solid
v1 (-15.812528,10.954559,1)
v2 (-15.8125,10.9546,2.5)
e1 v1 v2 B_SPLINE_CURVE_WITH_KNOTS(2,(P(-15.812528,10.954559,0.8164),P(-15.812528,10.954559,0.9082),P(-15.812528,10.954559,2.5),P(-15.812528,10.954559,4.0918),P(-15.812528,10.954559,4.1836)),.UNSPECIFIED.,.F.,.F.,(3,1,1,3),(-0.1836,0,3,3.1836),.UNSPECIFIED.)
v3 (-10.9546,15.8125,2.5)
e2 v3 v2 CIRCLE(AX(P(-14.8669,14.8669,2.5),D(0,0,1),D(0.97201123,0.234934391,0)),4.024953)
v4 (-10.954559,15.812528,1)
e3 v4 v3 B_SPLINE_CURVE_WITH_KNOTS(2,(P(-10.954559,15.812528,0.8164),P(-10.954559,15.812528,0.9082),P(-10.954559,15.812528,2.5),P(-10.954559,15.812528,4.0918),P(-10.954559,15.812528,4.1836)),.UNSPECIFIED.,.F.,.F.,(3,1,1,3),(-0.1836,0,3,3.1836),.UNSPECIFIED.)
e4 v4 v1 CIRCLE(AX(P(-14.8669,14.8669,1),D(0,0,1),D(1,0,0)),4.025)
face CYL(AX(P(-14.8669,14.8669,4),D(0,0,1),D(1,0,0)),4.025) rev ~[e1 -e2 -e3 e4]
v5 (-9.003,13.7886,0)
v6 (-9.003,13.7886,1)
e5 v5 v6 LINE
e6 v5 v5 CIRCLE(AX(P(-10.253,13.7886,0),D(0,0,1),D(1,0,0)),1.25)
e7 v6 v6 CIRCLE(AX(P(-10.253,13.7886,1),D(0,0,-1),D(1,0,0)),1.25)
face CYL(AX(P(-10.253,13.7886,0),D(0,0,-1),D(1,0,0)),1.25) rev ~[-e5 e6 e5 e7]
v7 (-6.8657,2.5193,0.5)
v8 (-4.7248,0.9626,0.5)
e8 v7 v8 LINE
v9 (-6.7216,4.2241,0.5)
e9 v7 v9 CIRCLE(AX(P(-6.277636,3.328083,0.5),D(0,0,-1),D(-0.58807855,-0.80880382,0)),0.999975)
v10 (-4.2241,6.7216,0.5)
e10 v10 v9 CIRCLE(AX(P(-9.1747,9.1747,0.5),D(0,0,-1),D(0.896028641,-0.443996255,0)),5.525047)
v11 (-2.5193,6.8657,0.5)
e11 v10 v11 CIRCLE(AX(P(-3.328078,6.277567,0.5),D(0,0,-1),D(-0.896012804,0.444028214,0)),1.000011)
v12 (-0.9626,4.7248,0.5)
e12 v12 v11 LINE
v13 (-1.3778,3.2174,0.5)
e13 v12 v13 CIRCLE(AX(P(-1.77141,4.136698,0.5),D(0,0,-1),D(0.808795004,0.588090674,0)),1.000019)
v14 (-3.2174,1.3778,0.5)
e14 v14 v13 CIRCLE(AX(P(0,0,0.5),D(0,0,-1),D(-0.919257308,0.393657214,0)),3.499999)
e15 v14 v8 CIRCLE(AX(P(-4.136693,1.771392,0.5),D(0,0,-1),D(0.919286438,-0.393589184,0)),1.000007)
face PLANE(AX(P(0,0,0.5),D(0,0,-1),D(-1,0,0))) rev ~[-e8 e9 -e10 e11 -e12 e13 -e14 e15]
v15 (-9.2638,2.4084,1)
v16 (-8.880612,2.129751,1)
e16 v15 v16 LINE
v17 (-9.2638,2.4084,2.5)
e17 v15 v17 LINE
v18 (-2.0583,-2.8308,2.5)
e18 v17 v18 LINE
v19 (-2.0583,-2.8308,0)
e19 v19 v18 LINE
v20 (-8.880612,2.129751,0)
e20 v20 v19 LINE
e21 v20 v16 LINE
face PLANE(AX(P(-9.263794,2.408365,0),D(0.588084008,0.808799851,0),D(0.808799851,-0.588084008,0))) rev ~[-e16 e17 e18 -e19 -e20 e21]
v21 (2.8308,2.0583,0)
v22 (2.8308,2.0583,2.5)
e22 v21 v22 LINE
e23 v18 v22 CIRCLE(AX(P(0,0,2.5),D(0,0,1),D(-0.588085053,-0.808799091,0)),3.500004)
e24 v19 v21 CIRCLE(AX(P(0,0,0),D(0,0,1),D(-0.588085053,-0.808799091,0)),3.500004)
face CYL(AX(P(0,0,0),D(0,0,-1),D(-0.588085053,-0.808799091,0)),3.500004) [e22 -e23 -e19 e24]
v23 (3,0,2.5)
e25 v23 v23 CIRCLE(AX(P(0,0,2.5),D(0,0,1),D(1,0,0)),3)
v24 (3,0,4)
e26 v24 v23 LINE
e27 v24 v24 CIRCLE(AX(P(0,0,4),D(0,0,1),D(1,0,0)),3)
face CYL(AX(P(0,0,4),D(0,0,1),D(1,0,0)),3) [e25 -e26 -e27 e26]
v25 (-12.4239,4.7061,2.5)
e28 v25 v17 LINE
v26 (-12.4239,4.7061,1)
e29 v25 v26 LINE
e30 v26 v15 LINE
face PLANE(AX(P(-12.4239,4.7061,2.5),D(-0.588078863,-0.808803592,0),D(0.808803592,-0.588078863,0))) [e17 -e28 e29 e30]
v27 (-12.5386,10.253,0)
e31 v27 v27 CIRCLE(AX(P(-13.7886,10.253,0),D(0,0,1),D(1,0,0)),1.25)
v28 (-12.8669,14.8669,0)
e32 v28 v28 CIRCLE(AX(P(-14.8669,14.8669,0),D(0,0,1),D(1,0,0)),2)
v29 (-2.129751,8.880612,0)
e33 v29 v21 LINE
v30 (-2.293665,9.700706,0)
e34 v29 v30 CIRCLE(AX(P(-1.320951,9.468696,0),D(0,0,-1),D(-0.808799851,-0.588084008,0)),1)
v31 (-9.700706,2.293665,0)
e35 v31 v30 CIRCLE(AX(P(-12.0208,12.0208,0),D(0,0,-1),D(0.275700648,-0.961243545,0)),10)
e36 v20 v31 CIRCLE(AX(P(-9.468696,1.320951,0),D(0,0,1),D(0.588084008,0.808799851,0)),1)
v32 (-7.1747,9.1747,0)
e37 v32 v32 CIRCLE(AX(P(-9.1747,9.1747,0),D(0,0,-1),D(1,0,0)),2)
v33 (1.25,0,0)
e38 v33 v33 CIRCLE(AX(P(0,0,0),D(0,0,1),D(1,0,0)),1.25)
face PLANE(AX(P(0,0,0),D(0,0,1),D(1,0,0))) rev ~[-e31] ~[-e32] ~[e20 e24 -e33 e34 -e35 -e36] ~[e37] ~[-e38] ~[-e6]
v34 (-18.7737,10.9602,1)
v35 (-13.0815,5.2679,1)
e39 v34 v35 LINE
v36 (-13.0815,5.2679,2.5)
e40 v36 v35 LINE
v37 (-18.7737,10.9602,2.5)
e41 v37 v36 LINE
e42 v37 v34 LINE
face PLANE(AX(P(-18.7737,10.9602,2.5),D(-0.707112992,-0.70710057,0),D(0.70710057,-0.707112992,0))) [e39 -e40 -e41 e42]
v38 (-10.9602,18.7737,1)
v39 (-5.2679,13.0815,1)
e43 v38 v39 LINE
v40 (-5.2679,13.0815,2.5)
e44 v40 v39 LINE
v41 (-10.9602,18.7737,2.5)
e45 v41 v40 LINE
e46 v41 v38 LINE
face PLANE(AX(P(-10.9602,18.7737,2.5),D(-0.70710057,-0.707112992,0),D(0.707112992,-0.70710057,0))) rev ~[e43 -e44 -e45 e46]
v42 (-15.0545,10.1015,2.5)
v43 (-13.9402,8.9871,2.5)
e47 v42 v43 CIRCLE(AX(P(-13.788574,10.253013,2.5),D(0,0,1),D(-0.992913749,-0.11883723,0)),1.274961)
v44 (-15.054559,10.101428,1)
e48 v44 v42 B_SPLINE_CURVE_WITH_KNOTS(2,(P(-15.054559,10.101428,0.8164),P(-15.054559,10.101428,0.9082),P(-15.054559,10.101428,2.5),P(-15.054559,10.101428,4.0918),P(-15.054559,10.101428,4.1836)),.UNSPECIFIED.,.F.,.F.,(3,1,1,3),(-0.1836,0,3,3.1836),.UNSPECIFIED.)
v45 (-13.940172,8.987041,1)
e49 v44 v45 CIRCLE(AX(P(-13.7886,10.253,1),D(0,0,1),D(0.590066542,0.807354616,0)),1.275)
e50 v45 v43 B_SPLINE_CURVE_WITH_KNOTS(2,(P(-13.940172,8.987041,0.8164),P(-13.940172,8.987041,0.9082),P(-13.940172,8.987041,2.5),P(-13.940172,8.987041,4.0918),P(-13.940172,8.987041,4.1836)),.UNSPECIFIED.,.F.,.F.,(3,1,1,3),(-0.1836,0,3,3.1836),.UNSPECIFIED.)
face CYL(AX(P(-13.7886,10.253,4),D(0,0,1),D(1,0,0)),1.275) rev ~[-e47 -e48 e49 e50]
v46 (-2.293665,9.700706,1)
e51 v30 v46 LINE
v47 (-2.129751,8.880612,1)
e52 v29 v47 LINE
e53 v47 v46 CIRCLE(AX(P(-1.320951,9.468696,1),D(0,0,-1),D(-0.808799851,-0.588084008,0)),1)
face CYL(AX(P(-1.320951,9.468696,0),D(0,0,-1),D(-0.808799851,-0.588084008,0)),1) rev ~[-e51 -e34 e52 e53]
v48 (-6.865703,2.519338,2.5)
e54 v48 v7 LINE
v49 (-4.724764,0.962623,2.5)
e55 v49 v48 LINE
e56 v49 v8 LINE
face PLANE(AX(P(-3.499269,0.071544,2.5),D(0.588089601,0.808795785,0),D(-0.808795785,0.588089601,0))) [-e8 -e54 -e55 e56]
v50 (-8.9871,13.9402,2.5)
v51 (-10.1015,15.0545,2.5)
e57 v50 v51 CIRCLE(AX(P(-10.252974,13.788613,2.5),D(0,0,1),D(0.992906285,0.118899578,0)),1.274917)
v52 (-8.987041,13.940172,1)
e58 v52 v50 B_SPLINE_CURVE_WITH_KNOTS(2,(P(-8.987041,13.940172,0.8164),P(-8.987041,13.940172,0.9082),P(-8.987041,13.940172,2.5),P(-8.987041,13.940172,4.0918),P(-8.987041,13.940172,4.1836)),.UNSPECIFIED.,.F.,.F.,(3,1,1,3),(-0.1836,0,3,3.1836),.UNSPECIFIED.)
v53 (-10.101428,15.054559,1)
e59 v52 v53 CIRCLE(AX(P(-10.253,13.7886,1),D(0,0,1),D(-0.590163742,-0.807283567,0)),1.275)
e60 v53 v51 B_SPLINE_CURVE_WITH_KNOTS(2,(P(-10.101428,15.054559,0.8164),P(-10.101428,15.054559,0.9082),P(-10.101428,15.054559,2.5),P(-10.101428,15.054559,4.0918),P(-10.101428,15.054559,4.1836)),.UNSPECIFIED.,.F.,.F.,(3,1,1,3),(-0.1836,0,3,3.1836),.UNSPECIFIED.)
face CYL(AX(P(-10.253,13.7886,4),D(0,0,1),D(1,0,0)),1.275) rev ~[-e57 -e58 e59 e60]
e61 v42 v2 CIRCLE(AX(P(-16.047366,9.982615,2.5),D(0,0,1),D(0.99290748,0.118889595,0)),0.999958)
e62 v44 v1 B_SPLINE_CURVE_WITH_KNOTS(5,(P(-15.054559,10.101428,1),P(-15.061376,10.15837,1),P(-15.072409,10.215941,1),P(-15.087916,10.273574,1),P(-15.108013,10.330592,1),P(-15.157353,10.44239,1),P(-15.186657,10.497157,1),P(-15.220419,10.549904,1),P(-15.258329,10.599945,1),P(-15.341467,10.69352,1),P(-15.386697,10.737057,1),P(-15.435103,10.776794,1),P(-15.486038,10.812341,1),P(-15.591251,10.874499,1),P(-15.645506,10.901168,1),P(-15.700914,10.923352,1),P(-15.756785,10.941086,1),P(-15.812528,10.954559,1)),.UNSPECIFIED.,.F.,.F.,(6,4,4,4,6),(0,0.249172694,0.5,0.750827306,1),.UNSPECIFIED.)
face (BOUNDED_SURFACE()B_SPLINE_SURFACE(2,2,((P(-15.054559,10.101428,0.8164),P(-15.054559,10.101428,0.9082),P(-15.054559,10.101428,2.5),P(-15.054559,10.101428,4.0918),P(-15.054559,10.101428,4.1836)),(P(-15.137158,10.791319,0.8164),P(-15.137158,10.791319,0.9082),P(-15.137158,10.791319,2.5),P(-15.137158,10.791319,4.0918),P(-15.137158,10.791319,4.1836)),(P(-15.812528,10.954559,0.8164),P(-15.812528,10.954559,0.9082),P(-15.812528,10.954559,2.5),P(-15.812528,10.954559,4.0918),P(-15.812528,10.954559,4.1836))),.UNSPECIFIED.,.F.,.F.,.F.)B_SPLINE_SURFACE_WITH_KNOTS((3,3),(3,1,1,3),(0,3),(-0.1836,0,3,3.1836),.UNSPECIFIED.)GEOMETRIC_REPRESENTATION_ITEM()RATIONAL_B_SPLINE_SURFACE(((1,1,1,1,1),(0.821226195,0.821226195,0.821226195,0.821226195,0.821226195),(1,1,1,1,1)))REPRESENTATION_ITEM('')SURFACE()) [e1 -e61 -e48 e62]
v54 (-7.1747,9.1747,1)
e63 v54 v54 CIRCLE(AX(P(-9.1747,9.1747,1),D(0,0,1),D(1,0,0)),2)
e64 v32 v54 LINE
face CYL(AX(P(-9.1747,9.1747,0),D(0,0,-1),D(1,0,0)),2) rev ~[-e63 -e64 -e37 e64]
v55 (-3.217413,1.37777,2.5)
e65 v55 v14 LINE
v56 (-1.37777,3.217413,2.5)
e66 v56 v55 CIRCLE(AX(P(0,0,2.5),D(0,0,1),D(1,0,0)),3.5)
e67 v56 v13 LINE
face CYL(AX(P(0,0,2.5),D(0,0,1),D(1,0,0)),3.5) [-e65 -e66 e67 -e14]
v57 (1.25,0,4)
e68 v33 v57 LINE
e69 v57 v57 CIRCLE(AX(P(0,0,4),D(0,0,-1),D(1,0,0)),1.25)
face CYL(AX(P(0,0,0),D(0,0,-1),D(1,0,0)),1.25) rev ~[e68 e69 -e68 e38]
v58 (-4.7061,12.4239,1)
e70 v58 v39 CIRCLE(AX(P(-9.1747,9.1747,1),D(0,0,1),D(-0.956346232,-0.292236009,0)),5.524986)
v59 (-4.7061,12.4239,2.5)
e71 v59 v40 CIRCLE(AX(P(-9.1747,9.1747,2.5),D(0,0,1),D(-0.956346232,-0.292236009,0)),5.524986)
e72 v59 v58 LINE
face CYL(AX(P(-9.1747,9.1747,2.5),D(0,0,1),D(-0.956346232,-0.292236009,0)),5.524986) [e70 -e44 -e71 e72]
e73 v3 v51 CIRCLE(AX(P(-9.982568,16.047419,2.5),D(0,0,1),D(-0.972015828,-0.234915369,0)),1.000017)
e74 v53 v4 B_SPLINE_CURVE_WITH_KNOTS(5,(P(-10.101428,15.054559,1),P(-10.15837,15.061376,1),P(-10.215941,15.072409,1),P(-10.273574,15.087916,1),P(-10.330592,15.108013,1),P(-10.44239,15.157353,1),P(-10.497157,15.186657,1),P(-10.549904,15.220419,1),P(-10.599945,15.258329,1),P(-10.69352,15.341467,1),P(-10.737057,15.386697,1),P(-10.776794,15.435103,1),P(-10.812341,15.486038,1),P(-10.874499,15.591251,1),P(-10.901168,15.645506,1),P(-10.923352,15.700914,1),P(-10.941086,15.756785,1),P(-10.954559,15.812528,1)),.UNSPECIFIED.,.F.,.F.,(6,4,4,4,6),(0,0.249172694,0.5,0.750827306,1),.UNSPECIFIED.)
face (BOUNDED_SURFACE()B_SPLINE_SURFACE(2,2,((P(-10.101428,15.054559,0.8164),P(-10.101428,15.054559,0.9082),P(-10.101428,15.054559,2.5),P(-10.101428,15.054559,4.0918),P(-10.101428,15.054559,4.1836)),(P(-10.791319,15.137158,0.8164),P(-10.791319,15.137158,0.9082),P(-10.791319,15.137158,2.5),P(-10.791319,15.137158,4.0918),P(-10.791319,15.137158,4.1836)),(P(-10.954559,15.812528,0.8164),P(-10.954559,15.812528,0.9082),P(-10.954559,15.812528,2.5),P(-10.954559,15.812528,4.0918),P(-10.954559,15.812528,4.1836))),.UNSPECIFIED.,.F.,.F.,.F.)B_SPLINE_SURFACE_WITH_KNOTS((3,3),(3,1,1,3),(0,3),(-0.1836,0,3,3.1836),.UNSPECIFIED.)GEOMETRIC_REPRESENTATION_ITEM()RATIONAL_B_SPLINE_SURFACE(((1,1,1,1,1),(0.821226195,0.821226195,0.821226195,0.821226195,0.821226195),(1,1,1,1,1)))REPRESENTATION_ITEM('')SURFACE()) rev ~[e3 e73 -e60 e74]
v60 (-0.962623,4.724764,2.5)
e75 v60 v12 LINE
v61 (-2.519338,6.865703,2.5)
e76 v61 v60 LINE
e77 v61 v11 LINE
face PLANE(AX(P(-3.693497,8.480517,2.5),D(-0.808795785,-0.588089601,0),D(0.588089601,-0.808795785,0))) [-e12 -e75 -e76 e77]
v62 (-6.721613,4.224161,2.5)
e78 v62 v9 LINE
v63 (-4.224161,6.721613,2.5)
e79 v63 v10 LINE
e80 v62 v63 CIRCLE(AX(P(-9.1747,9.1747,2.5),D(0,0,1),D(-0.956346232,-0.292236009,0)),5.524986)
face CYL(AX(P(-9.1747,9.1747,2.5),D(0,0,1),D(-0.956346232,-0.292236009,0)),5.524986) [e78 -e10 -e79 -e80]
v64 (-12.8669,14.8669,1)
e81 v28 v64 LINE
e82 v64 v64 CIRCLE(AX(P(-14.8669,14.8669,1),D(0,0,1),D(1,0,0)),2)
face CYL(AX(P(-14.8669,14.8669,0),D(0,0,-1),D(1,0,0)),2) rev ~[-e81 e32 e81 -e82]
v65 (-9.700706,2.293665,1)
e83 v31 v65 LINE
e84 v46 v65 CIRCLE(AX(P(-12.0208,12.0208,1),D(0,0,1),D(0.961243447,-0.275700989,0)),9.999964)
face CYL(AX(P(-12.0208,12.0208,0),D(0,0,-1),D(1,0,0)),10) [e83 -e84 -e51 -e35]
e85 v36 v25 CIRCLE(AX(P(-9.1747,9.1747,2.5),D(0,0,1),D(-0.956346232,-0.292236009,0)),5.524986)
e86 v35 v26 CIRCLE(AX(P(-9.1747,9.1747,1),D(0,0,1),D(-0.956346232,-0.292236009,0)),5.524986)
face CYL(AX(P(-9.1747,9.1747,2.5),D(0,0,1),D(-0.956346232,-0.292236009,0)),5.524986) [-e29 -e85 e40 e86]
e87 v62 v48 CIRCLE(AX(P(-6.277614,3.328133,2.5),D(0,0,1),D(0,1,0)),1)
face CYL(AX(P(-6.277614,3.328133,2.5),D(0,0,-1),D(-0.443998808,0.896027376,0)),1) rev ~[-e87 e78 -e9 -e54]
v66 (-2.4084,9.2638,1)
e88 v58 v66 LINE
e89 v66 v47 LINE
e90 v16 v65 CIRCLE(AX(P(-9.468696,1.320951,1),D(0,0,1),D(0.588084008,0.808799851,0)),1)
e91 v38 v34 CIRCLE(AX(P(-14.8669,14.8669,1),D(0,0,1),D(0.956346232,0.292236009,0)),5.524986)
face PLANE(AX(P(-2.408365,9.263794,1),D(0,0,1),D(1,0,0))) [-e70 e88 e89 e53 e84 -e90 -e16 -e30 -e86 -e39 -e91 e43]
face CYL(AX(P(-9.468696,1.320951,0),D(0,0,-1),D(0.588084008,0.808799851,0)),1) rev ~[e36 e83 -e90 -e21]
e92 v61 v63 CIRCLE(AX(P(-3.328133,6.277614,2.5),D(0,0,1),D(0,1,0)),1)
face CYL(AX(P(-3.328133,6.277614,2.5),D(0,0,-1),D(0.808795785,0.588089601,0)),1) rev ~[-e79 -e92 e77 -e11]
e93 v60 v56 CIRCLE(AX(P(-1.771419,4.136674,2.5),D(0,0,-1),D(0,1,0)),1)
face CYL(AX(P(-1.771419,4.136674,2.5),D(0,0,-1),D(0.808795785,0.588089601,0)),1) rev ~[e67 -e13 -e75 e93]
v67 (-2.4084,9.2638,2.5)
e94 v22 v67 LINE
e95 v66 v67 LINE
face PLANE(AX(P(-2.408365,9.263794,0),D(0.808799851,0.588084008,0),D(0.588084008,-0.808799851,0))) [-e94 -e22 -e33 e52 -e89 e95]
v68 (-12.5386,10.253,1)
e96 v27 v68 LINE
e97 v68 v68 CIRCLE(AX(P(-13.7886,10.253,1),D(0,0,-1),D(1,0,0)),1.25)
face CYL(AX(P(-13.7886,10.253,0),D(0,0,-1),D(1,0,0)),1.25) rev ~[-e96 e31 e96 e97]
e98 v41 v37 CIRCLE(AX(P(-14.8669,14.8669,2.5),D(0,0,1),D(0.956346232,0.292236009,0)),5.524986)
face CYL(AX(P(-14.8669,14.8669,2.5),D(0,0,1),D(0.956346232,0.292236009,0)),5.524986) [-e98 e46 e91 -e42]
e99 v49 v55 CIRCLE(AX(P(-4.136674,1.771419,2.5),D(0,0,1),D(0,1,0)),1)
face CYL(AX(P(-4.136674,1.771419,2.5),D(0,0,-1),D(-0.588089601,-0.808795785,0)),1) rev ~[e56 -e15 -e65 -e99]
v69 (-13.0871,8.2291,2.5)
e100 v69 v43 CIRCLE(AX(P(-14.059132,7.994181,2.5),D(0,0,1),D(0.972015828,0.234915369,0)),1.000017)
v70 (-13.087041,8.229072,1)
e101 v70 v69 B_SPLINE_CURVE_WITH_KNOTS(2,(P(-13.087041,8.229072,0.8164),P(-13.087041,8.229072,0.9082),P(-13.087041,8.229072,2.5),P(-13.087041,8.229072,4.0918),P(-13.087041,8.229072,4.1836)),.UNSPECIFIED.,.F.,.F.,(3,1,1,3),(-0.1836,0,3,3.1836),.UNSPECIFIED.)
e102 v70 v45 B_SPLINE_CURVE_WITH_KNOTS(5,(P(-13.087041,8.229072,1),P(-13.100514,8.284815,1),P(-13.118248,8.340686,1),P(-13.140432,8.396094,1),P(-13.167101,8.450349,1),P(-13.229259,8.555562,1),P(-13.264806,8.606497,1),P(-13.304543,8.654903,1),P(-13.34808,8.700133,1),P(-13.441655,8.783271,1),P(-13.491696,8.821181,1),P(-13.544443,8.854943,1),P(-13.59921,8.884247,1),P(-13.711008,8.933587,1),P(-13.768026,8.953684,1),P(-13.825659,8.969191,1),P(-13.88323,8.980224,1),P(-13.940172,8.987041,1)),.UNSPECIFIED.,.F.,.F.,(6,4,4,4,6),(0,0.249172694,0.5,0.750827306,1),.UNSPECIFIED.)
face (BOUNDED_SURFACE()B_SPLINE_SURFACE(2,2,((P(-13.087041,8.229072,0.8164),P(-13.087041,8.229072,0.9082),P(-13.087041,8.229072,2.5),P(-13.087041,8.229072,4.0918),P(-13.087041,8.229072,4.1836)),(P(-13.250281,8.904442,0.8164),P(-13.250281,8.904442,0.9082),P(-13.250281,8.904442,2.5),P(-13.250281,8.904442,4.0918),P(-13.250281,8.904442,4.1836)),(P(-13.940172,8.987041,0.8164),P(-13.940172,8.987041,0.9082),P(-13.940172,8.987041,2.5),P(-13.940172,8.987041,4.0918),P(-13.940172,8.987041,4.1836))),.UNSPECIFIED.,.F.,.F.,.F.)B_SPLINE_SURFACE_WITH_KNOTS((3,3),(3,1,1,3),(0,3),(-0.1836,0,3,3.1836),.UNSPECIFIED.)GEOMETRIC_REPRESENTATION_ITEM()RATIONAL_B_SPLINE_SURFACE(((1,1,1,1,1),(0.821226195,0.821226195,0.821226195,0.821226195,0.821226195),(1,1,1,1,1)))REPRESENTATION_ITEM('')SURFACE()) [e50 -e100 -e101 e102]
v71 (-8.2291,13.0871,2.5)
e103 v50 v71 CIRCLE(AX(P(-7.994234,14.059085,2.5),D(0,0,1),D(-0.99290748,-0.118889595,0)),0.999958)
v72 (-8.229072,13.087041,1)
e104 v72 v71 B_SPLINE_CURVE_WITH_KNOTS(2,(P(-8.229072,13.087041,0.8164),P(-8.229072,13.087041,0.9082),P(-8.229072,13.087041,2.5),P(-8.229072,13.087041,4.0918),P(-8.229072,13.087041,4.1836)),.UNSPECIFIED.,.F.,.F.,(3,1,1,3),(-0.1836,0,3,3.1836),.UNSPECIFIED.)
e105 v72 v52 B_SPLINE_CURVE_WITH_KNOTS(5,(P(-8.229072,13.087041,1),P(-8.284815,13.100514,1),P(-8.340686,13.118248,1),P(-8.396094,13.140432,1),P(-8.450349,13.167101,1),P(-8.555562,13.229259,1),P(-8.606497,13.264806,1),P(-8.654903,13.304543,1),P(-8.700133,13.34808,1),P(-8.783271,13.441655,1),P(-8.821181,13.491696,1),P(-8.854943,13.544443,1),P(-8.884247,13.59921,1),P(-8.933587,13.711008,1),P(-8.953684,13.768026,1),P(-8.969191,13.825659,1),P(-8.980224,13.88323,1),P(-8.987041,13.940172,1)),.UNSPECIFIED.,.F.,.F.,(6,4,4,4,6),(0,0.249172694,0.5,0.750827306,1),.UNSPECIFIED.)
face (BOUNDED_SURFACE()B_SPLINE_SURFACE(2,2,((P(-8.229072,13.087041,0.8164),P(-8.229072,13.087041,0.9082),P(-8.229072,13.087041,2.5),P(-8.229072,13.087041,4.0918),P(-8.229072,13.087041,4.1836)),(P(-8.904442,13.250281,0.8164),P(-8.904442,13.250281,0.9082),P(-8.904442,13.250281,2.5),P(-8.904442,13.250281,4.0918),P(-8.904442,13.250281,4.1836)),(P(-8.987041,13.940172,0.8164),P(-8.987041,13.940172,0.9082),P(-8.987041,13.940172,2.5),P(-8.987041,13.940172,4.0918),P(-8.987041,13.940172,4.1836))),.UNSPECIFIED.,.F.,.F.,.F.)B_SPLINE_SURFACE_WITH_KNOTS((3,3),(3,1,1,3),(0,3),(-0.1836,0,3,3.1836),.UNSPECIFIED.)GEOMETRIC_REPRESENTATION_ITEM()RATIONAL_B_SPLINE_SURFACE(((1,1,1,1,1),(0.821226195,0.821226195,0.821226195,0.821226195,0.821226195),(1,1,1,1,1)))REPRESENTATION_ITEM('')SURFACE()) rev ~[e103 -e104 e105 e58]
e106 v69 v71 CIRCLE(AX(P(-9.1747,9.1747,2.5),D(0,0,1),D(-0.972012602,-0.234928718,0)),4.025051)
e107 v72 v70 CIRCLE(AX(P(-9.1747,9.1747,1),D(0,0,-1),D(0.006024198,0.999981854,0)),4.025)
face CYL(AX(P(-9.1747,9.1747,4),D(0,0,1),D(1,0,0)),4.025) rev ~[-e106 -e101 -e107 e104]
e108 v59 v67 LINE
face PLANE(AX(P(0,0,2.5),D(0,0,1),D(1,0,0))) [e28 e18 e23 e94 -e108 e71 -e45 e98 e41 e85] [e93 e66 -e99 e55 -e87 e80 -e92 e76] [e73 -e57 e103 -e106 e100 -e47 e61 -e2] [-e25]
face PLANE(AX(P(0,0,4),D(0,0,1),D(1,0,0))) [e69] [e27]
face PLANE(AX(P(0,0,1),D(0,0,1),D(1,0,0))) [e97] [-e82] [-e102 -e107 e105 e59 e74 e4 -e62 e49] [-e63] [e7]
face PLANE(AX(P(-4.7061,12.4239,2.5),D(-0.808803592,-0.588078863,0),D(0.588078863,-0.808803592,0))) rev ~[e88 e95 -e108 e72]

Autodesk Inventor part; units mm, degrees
ref_plane "YZ Plane" through (0, 0, 0) normal (1, 0, 0) x (0, 1, 0)
ref_plane "XZ Plane" through (0, 0, 0) normal (0, 1, 0) x (-1, 0, 0)
ref_plane "XY Plane" through (0, 0, 0) normal (0, 0, 1) x (1, 0, 0)
sketch "スケッチ1" plane through (0, 0, 0) normal (0, 0, 1) x (1, 0, 0)
  line L0 (0, 0) -> (-12.0208, 12.0208)
  circle A0 centre (-9.1747, 9.1747) radius 2
  circle A1 centre (-14.8669, 14.8669) radius 2
  circle A2 centre (-14.8669, 14.8669) radius 4.025 construction
  circle A3 centre (-9.1747, 9.1747) radius 4.025 construction
  circle A4 centre (-13.7886, 10.253) radius 1.25
  circle A5 centre (-10.253, 13.7886) radius 1.25
  line L1 (-13.7886, 10.253) -> (-10.253, 13.7886) construction
  circle A6 centre (0, 0) radius 1.25
  arc A7 (-2.4749, 2.4749) -> (-2.0583, -2.8308) centre (0, 0) ccw construction
  arc A8 (-14.6971, 9.3445) -> (-9.5747, 16.4536) centre (-14.8669, 14.8669) ccw construction
  arc A9 (-14.467, 7.588) -> (-12.4239, 4.7061) centre (-9.1747, 9.1747) ccw
  line L2 (-12.4239, 4.7061) -> (-2.0583, -2.8308)
  line L3 (-4.7061, 12.4239) -> (2.8308, 2.0583)
  arc A10 (-11.1417, 16.3911) -> (-7.588, 14.467) centre (-10.253, 13.7886) ccw construction
  arc A11 (-16.4536, 9.5747) -> (-14.467, 7.588) centre (-13.7886, 10.253) ccw
  arc A12 (-16.3911, 11.1417) -> (-16.4536, 9.5747) centre (-13.7886, 10.253) ccw construction
  arc A13 (-14.467, 7.588) -> (-16.3911, 11.1417) centre (-13.7886, 10.253) ccw construction
  arc A14 (-16.4536, 9.5747) -> (-14.6971, 9.3445) centre (-14.8669, 14.8669) ccw construction
  arc A15 (-14.6971, 9.3445) -> (-14.467, 7.588) centre (-9.1747, 9.1747) ccw construction
  arc A16 (-9.5747, 16.4536) -> (-11.1417, 16.3911) centre (-10.253, 13.7886) ccw construction
  arc A17 (-7.588, 14.467) -> (-9.3445, 14.6971) centre (-9.1747, 9.1747) ccw construction
  arc A18 (-7.588, 14.467) -> (-9.5747, 16.4536) centre (-10.253, 13.7886) ccw
  arc A19 (-9.5747, 16.4536) -> (-16.4536, 9.5747) centre (-14.8669, 14.8669) ccw
  arc A20 (-9.3445, 14.6971) -> (-14.6971, 9.3445) centre (-9.1747, 9.1747) ccw construction
  arc A21 (-4.7061, 12.4239) -> (-7.588, 14.467) centre (-9.1747, 9.1747) ccw
  arc A22 (-12.4239, 4.7061) -> (-4.7061, 12.4239) centre (-9.1747, 9.1747) ccw construction
  arc A23 (2.8308, 2.0583) -> (-2.4749, 2.4749) centre (0, 0) ccw construction
  arc A24 (-2.0583, -2.8308) -> (2.8308, 2.0583) centre (0, 0) ccw
  circle A25 centre (-12.0208, 12.0208) radius 10
  point P0 (-2.4084, 9.2638)
  point P1 (-9.2638, 2.4084)
  dimension "d3" = 8.05
  dimension "d0" = 4
  dimension "d1" = 4
  dimension "d2" = 8.05
  dimension "d4" = 2.5
  dimension "d5" = 2.5
  dimension "d6" = 5
  dimension "d7" = 2.5
  dimension "d8" = 7
  dimension "d9" = 1.5
  dimension "d10" = 1.5
  dimension "d11" = 1.5
  dimension "d12" = 1.5
  dimension "d13" = 17
  dimension "d59" = 20
extrude "押し出し1" add sketch "スケッチ1" along normal blind 4
sketch "スケッチ2" plane through (0, 0, 4) normal (0, 0, 1) x (1, 0, 0)
  circle A0 centre (-14.8669, 14.8669) radius 2 projected
  circle A1 centre (-13.7886, 10.253) radius 1.25 projected
  circle A2 centre (-10.253, 13.7886) radius 1.25 projected
  circle A3 centre (-9.1747, 9.1747) radius 2 projected
  circle A4 centre (-14.8669, 14.8669) radius 4.025
  circle A5 centre (-9.1747, 9.1747) radius 4.025
  point P0 (0, 0)
  point P1 (-10.842, 14.8911)
  point P2 (-14.8911, 10.842)
  point P3 (-13.0613, 11.2697)
  point P4 (-12.0208, 12.0208)
  point P5 (-11.2697, 13.0613)
  point P6 (-9.1505, 13.1996)
  point P7 (-10.9804, 12.772)
  point P8 (-12.772, 10.9804)
  point P9 (-13.1996, 9.1505)
  dimension "d17" = 8.05
  dimension "d18" = 8.05
extrude "押し出し2" cut sketch "スケッチ2" against normal blind 3 contours A1 A5 A2 | A1 A4 A2
sketch "スケッチ3" plane through (0, 0, 4) normal (0, 0, 1) x (1, 0, 0)
  arc A0 (-13.0613, 11.2697) -> (-12.0208, 12.0208) centre (-14.8669, 14.8669) ccw projected
  arc A1 (-12.772, 10.9804) -> (-13.0613, 11.2697) centre (-13.7886, 10.253) ccw projected
  arc A2 (-12.0208, 12.0208) -> (-12.772, 10.9804) centre (-9.1747, 9.1747) ccw projected
  arc A3 (-12.0208, 12.0208) -> (-11.2697, 13.0613) centre (-14.8669, 14.8669) ccw projected
  arc A4 (-10.9804, 12.772) -> (-12.0208, 12.0208) centre (-9.1747, 9.1747) ccw projected
  arc A5 (-11.2697, 13.0613) -> (-10.9804, 12.772) centre (-10.253, 13.7886) ccw projected
  arc A6 (-13.0613, 11.2697) -> (-14.8911, 10.842) centre (-13.7886, 10.253) ccw projected
  circle A7 centre (-13.7886, 10.253) radius 1.275
  circle A8 centre (-10.253, 13.7886) radius 1.275
  point P0 (0, 0)
  point P1 (-11.2824, 13.0362)
  point P2 (-11.0055, 12.7593)
  point P3 (-13.0362, 11.2824)
  point P4 (-12.7593, 11.0055)
  dimension "d21" = 2.55
  dimension "d22" = 2.55
extrude "押し出し3" cut sketch "スケッチ3" against normal blind 3
fillet "フィレット1" radius 1 4 edges at (-9.1224, 13.1994, 2.5) (-10.8423, 14.9193, 2.5) (-14.9193, 10.8423, 2.5) (-13.1994, 9.1224, 2.5)
sketch "スケッチ4" plane through (0, 0, 4) normal (0, 0, 1) x (1, 0, 0)
  circle A0 centre (0, 0) radius 1.25 projected
  circle A1 centre (0, 0) radius 3
  circle A2 centre (0, 0) radius 1.25 projected
  line L0 (-9.2638, 2.4084) -> (-2.0583, -2.8308) projected
  arc A3 (-2.0583, -2.8308) -> (2.8308, 2.0583) centre (0, 0) ccw projected
  line L1 (2.8308, 2.0583) -> (-2.4084, 9.2638) projected
  arc A4 (-2.4084, 9.2638) -> (-9.2638, 2.4084) centre (-12.0208, 12.0208) ccw projected
  arc A5 (-13.0871, 8.2291) -> (-13.9402, 8.9871) centre (-14.0591, 7.9942) ccw projected
  arc A6 (-15.0545, 10.1015) -> (-13.9402, 8.9871) centre (-13.7886, 10.253) ccw projected
  arc A7 (-15.0545, 10.1015) -> (-15.8125, 10.9546) centre (-16.0474, 9.9826) ccw projected
  arc A8 (-10.9546, 15.8125) -> (-15.8125, 10.9546) centre (-14.8669, 14.8669) ccw projected
  arc A9 (-10.9546, 15.8125) -> (-10.1015, 15.0545) centre (-9.9826, 16.0474) ccw projected
  arc A10 (-8.9871, 13.9402) -> (-10.1015, 15.0545) centre (-10.253, 13.7886) ccw projected
  arc A11 (-8.9871, 13.9402) -> (-8.2291, 13.0871) centre (-7.9942, 14.0591) ccw projected
  arc A12 (-13.0871, 8.2291) -> (-8.2291, 13.0871) centre (-9.1747, 9.1747) ccw projected
  dimension "d27" = 6
extrude "押し出し4" cut sketch "スケッチ4" against normal blind 1.5 contours A4 L1 A3 L0
sketch "スケッチ8" plane through (0, 0, 2.5) normal (0, 0, 1) x (1, 0, 0)
  circle A0 centre (-9.1747, 9.1747) radius 2 projected
  circle A1 centre (-14.8669, 14.8669) radius 2 projected
  arc A2 (-10.9546, 15.8125) -> (-15.8125, 10.9546) centre (-14.8669, 14.8669) ccw projected
  circle A3 centre (-13.7886, 10.253) radius 1.25 projected
  arc A4 (-13.0871, 8.2291) -> (-8.2291, 13.0871) centre (-9.1747, 9.1747) ccw projected
  circle A5 centre (-10.253, 13.7886) radius 1.25 projected
  arc A6 (-8.9871, 13.9402) -> (-8.2291, 13.0871) centre (-7.9942, 14.0591) ccw projected
  arc A7 (-8.9871, 13.9402) -> (-10.1015, 15.0545) centre (-10.253, 13.7886) ccw projected
  arc A8 (-10.9546, 15.8125) -> (-10.1015, 15.0545) centre (-9.9826, 16.0474) ccw projected
  arc A9 (-15.0545, 10.1015) -> (-15.8125, 10.9546) centre (-16.0474, 9.9826) ccw projected
  arc A10 (-15.0545, 10.1015) -> (-13.9402, 8.9871) centre (-13.7886, 10.253) ccw projected
  arc A11 (-13.0871, 8.2291) -> (-13.9402, 8.9871) centre (-14.0591, 7.9942) ccw projected
  arc A12 (-9.5831, 16.4815) -> (-16.4815, 9.5831) centre (-14.8669, 14.8669) ccw
  arc A13 (-7.5601, 14.4585) -> (-9.5831, 16.4815) centre (-10.253, 13.7886) ccw
  arc A14 (-14.4585, 7.5601) -> (-7.5601, 14.4585) centre (-9.1747, 9.1747) ccw
  arc A15 (-16.4815, 9.5831) -> (-14.4585, 7.5601) centre (-13.7886, 10.253) ccw
  line L0 (-18.7737, 10.9602) -> (-13.0815, 5.2679)
  line L1 (-10.9602, 18.7737) -> (-5.2679, 13.0815)
  line L2 (-2.0583, -2.8308) -> (-9.2638, 2.4084) projected
  arc A16 (-2.4084, 9.2638) -> (-9.2638, 2.4084) centre (-12.0208, 12.0208) ccw projected
  line L3 (-2.0583, -2.8308) -> (-9.2638, 2.4084) projected
  arc A17 (-2.0583, -2.8308) -> (2.8308, 2.0583) centre (0, 0) ccw projected
  line L4 (-2.4084, 9.2638) -> (2.8308, 2.0583) projected
  circle A18 centre (0, 0) radius 3 projected
  arc A19 (-10.9546, 15.8125) -> (-15.8125, 10.9546) centre (-14.8669, 14.8669) ccw projected
  arc A20 (-10.9546, 15.8125) -> (-10.1015, 15.0545) centre (-9.9826, 16.0474) ccw projected
  arc A21 (-8.9871, 13.9402) -> (-10.1015, 15.0545) centre (-10.253, 13.7886) ccw projected
  arc A22 (-8.9871, 13.9402) -> (-8.2291, 13.0871) centre (-7.9942, 14.0591) ccw projected
  arc A23 (-13.0871, 8.2291) -> (-8.2291, 13.0871) centre (-9.1747, 9.1747) ccw projected
  arc A24 (-13.0871, 8.2291) -> (-13.9402, 8.9871) centre (-14.0591, 7.9942) ccw projected
  arc A25 (-15.0545, 10.1015) -> (-13.9402, 8.9871) centre (-13.7886, 10.253) ccw projected
  arc A26 (-15.0545, 10.1015) -> (-15.8125, 10.9546) centre (-16.0474, 9.9826) ccw projected
  line L5 (-12.4239, 4.7061) -> (-9.2638, 2.4084)
  line L6 (-4.7061, 12.4239) -> (-2.4084, 9.2638)
  dimension "d61" = 1.5
extrude "押し出し8" cut sketch "スケッチ8" against normal blind 1.5 contours A12 L0 A14 L5 A16 L6 L1
sketch "スケッチ9" plane through (0, 0, 2.5) normal (0, 0, 1) x (1, 0, 0)
  circle A0 centre (-9.1747, 9.1747) radius 2 projected
  circle A1 centre (-14.8669, 14.8669) radius 2 projected
  circle A2 centre (0, 0) radius 3 projected
  circle A3 centre (0, 0) radius 3.5
  arc A4 (-14.4585, 7.5601) -> (-7.5601, 14.4585) centre (-9.1747, 9.1747) ccw
  arc A5 (-16.4815, 9.5831) -> (-14.4585, 7.5601) centre (-13.7886, 10.253) ccw
  arc A6 (-9.5831, 16.4815) -> (-16.4815, 9.5831) centre (-14.8669, 14.8669) ccw
  arc A7 (-7.5601, 14.4585) -> (-9.5831, 16.4815) centre (-10.253, 13.7886) ccw
  line L0 (-2.4084, 9.2638) -> (2.8308, 2.0583) projected
  line L1 (-2.0583, -2.8308) -> (-9.2638, 2.4084) projected
  line L2 (-3.9623, 8.8502) -> (1.6176, 1.1762)
  line L3 (-1.1762, -1.6176) -> (-8.8502, 3.9623)
  arc A8 (-10.9546, 15.8125) -> (-15.8125, 10.9546) centre (-14.8669, 14.8669) ccw projected
  circle A9 centre (-13.7886, 10.253) radius 1.25 projected
  arc A10 (-13.0871, 8.2291) -> (-8.2291, 13.0871) centre (-9.1747, 9.1747) ccw projected
  circle A11 centre (-10.253, 13.7886) radius 1.25 projected
  arc A12 (-8.9871, 13.9402) -> (-8.2291, 13.0871) centre (-7.9942, 14.0591) ccw projected
  arc A13 (-8.9871, 13.9402) -> (-10.1015, 15.0545) centre (-10.253, 13.7886) ccw projected
  arc A14 (-10.9546, 15.8125) -> (-10.1015, 15.0545) centre (-9.9826, 16.0474) ccw projected
  arc A15 (-15.0545, 10.1015) -> (-15.8125, 10.9546) centre (-16.0474, 9.9826) ccw projected
  arc A16 (-15.0545, 10.1015) -> (-13.9402, 8.9871) centre (-13.7886, 10.253) ccw projected
  arc A17 (-13.0871, 8.2291) -> (-13.9402, 8.9871) centre (-14.0591, 7.9942) ccw projected
  point P0 (-8.4806, 3.6935)
  point P1 (-3.4993, 0.0715)
  point P2 (-0.0715, 3.4993)
  point P3 (-3.6935, 8.4806)
  dimension "d48" = 0.5
  dimension "d50" = 1.5
  dimension "d51" = 1.5
extrude "押し出し9" cut sketch "スケッチ9" against normal through all contours A3 L3 A4 L2
fillet "フィレット4" radius 1 4 edges at (-8.4806, 3.6935, 1.25) (-3.4993, 0.0715, 1.25) (-3.6935, 8.4806, 1.25) (-0.0715, 3.4993, 1.25)
fillet "フィレット6" radius 1 2 edges at (-9.2638, 2.4084, 0.5) (-2.4084, 9.2638, 0.5)
sketch "スケッチ10" plane through (0, 0, 0) normal (0, 0, -1) x (-1, 0, 0)
  line L0 (0.9626, 4.7248) -> (2.5193, 6.8657) projected
  arc A0 (4.2241, 6.7216) -> (2.5193, 6.8657) centre (3.3281, 6.2776) ccw projected
  arc A1 (4.2241, 6.7216) -> (6.7216, 4.2241) centre (9.1747, 9.1747) ccw projected
  arc A2 (6.8657, 2.5193) -> (6.7216, 4.2241) centre (6.2776, 3.3281) ccw projected
  line L1 (6.8657, 2.5193) -> (4.7248, 0.9626) projected
  arc A3 (3.2174, 1.3778) -> (4.7248, 0.9626) centre (4.1367, 1.7714) ccw projected
  arc A4 (3.2174, 1.3778) -> (1.3778, 3.2174) centre (0, 0) ccw projected
  arc A5 (0.9626, 4.7248) -> (1.3778, 3.2174) centre (1.7714, 4.1367) ccw projected
  line L2 (-2.8308, 2.0583) -> (2.1298, 8.8806) projected
  arc A6 (-2.8308, 2.0583) -> (2.0583, -2.8308) centre (0, 0) ccw projected
  line L3 (8.8806, 2.1298) -> (2.0583, -2.8308) projected
  arc A7 (9.7007, 2.2937) -> (8.8806, 2.1298) centre (9.4687, 1.321) ccw projected
  arc A8 (9.7007, 2.2937) -> (2.2937, 9.7007) centre (12.0208, 12.0208) ccw projected
  arc A9 (2.1298, 8.8806) -> (2.2937, 9.7007) centre (1.321, 9.4687) ccw projected
  circle A10 centre (9.1747, 9.1747) radius 2 projected
  circle A11 centre (0, 0) radius 1.25 projected
  circle A12 centre (14.8669, 14.8669) radius 2 projected
  circle A13 centre (10.253, 13.7886) radius 1.25 projected
  circle A14 centre (13.7886, 10.253) radius 1.25 projected
extrude "押し出し10" add sketch "スケッチ10" against normal blind 0.5 contours L0 A0 A1 A2 L1 A3 A4 A5
sketch "スケッチ11" plane through (0, 0, 4) normal (0, 0, 1) x (1, 0, 0)
  circle A0 centre (0, 0) radius 3 projected
  arc A1 (-10.9546, 15.8125) -> (-15.8125, 10.9546) centre (-14.8669, 14.8669) ccw projected
  arc A2 (-10.9546, 15.8125) -> (-10.1015, 15.0545) centre (-9.9826, 16.0474) ccw projected
  arc A3 (-8.9871, 13.9402) -> (-10.1015, 15.0545) centre (-10.253, 13.7886) ccw projected
  arc A4 (-8.9871, 13.9402) -> (-8.2291, 13.0871) centre (-7.9942, 14.0591) ccw projected
  arc A5 (-13.0871, 8.2291) -> (-8.2291, 13.0871) centre (-9.1747, 9.1747) ccw projected
  arc A6 (-13.0871, 8.2291) -> (-13.9402, 8.9871) centre (-14.0591, 7.9942) ccw projected
  arc A7 (-15.0545, 10.1015) -> (-13.9402, 8.9871) centre (-13.7886, 10.253) ccw projected
  arc A8 (-15.0545, 10.1015) -> (-15.8125, 10.9546) centre (-16.0474, 9.9826) ccw projected
  arc A9 (-1.3778, 3.2174) -> (-3.2174, 1.3778) centre (0, 0) ccw projected
  arc A10 (-1.3778, 3.2174) -> (-0.9626, 4.7248) centre (-1.7714, 4.1367) ccw projected
  line L0 (-2.5193, 6.8657) -> (-0.9626, 4.7248) projected
  arc A11 (-2.5193, 6.8657) -> (-4.2241, 6.7216) centre (-3.3281, 6.2776) ccw projected
  arc A12 (-6.7216, 4.2241) -> (-4.2241, 6.7216) centre (-9.1747, 9.1747) ccw projected
  arc A13 (-6.7216, 4.2241) -> (-6.8657, 2.5193) centre (-6.2776, 3.3281) ccw projected
  line L1 (-4.7248, 0.9626) -> (-6.8657, 2.5193) projected
  arc A14 (-4.7248, 0.9626) -> (-3.2174, 1.3778) centre (-4.1367, 1.7714) ccw projected
  line L2 (2.8308, 2.0583) -> (-4.7061, 12.4239) projected
  line L3 (-5.2679, 13.0815) -> (-10.9602, 18.7737) projected
  arc A15 (-10.9602, 18.7737) -> (-18.7737, 10.9602) centre (-14.8669, 14.8669) ccw projected
  line L4 (-18.7737, 10.9602) -> (-13.0815, 5.2679) projected
  arc A16 (-13.0815, 5.2679) -> (-12.4239, 4.7061) centre (-9.1747, 9.1747) ccw projected
  line L5 (-2.0583, -2.8308) -> (-12.4239, 4.7061) projected
  arc A17 (-4.7061, 12.4239) -> (-5.2679, 13.0815) centre (-9.1747, 9.1747) ccw projected
  arc A18 (-2.0583, -2.8308) -> (2.8308, 2.0583) centre (0, 0) ccw projected
  line L6 (2.8308, 2.0583) -> (-2.1298, 8.8806) projected
  arc A19 (-2.0583, -2.8308) -> (2.8308, 2.0583) centre (0, 0) ccw projected
  line L7 (-8.8806, 2.1298) -> (-2.0583, -2.8308) projected
  arc A20 (-8.8806, 2.1298) -> (-9.7007, 2.2937) centre (-9.4687, 1.321) ccw projected
  arc A21 (-2.2937, 9.7007) -> (-9.7007, 2.2937) centre (-12.0208, 12.0208) ccw projected
  arc A22 (-2.2937, 9.7007) -> (-2.1298, 8.8806) centre (-1.321, 9.4687) ccw projected
  circle A23 centre (-9.1747, 9.1747) radius 2 projected
  circle A24 centre (0, 0) radius 1.25 projected
  circle A25 centre (-14.8669, 14.8669) radius 2 projected
  circle A26 centre (-10.253, 13.7886) radius 1.25 projected
  circle A27 centre (-13.7886, 10.253) radius 1.25 projected
equation "\"d3\" = d2"
equation "\"d0\" = d1"
equation "\"d21\" = d22"
properties part number "脚クランク涙型1" material "アルミニウム 7075"
